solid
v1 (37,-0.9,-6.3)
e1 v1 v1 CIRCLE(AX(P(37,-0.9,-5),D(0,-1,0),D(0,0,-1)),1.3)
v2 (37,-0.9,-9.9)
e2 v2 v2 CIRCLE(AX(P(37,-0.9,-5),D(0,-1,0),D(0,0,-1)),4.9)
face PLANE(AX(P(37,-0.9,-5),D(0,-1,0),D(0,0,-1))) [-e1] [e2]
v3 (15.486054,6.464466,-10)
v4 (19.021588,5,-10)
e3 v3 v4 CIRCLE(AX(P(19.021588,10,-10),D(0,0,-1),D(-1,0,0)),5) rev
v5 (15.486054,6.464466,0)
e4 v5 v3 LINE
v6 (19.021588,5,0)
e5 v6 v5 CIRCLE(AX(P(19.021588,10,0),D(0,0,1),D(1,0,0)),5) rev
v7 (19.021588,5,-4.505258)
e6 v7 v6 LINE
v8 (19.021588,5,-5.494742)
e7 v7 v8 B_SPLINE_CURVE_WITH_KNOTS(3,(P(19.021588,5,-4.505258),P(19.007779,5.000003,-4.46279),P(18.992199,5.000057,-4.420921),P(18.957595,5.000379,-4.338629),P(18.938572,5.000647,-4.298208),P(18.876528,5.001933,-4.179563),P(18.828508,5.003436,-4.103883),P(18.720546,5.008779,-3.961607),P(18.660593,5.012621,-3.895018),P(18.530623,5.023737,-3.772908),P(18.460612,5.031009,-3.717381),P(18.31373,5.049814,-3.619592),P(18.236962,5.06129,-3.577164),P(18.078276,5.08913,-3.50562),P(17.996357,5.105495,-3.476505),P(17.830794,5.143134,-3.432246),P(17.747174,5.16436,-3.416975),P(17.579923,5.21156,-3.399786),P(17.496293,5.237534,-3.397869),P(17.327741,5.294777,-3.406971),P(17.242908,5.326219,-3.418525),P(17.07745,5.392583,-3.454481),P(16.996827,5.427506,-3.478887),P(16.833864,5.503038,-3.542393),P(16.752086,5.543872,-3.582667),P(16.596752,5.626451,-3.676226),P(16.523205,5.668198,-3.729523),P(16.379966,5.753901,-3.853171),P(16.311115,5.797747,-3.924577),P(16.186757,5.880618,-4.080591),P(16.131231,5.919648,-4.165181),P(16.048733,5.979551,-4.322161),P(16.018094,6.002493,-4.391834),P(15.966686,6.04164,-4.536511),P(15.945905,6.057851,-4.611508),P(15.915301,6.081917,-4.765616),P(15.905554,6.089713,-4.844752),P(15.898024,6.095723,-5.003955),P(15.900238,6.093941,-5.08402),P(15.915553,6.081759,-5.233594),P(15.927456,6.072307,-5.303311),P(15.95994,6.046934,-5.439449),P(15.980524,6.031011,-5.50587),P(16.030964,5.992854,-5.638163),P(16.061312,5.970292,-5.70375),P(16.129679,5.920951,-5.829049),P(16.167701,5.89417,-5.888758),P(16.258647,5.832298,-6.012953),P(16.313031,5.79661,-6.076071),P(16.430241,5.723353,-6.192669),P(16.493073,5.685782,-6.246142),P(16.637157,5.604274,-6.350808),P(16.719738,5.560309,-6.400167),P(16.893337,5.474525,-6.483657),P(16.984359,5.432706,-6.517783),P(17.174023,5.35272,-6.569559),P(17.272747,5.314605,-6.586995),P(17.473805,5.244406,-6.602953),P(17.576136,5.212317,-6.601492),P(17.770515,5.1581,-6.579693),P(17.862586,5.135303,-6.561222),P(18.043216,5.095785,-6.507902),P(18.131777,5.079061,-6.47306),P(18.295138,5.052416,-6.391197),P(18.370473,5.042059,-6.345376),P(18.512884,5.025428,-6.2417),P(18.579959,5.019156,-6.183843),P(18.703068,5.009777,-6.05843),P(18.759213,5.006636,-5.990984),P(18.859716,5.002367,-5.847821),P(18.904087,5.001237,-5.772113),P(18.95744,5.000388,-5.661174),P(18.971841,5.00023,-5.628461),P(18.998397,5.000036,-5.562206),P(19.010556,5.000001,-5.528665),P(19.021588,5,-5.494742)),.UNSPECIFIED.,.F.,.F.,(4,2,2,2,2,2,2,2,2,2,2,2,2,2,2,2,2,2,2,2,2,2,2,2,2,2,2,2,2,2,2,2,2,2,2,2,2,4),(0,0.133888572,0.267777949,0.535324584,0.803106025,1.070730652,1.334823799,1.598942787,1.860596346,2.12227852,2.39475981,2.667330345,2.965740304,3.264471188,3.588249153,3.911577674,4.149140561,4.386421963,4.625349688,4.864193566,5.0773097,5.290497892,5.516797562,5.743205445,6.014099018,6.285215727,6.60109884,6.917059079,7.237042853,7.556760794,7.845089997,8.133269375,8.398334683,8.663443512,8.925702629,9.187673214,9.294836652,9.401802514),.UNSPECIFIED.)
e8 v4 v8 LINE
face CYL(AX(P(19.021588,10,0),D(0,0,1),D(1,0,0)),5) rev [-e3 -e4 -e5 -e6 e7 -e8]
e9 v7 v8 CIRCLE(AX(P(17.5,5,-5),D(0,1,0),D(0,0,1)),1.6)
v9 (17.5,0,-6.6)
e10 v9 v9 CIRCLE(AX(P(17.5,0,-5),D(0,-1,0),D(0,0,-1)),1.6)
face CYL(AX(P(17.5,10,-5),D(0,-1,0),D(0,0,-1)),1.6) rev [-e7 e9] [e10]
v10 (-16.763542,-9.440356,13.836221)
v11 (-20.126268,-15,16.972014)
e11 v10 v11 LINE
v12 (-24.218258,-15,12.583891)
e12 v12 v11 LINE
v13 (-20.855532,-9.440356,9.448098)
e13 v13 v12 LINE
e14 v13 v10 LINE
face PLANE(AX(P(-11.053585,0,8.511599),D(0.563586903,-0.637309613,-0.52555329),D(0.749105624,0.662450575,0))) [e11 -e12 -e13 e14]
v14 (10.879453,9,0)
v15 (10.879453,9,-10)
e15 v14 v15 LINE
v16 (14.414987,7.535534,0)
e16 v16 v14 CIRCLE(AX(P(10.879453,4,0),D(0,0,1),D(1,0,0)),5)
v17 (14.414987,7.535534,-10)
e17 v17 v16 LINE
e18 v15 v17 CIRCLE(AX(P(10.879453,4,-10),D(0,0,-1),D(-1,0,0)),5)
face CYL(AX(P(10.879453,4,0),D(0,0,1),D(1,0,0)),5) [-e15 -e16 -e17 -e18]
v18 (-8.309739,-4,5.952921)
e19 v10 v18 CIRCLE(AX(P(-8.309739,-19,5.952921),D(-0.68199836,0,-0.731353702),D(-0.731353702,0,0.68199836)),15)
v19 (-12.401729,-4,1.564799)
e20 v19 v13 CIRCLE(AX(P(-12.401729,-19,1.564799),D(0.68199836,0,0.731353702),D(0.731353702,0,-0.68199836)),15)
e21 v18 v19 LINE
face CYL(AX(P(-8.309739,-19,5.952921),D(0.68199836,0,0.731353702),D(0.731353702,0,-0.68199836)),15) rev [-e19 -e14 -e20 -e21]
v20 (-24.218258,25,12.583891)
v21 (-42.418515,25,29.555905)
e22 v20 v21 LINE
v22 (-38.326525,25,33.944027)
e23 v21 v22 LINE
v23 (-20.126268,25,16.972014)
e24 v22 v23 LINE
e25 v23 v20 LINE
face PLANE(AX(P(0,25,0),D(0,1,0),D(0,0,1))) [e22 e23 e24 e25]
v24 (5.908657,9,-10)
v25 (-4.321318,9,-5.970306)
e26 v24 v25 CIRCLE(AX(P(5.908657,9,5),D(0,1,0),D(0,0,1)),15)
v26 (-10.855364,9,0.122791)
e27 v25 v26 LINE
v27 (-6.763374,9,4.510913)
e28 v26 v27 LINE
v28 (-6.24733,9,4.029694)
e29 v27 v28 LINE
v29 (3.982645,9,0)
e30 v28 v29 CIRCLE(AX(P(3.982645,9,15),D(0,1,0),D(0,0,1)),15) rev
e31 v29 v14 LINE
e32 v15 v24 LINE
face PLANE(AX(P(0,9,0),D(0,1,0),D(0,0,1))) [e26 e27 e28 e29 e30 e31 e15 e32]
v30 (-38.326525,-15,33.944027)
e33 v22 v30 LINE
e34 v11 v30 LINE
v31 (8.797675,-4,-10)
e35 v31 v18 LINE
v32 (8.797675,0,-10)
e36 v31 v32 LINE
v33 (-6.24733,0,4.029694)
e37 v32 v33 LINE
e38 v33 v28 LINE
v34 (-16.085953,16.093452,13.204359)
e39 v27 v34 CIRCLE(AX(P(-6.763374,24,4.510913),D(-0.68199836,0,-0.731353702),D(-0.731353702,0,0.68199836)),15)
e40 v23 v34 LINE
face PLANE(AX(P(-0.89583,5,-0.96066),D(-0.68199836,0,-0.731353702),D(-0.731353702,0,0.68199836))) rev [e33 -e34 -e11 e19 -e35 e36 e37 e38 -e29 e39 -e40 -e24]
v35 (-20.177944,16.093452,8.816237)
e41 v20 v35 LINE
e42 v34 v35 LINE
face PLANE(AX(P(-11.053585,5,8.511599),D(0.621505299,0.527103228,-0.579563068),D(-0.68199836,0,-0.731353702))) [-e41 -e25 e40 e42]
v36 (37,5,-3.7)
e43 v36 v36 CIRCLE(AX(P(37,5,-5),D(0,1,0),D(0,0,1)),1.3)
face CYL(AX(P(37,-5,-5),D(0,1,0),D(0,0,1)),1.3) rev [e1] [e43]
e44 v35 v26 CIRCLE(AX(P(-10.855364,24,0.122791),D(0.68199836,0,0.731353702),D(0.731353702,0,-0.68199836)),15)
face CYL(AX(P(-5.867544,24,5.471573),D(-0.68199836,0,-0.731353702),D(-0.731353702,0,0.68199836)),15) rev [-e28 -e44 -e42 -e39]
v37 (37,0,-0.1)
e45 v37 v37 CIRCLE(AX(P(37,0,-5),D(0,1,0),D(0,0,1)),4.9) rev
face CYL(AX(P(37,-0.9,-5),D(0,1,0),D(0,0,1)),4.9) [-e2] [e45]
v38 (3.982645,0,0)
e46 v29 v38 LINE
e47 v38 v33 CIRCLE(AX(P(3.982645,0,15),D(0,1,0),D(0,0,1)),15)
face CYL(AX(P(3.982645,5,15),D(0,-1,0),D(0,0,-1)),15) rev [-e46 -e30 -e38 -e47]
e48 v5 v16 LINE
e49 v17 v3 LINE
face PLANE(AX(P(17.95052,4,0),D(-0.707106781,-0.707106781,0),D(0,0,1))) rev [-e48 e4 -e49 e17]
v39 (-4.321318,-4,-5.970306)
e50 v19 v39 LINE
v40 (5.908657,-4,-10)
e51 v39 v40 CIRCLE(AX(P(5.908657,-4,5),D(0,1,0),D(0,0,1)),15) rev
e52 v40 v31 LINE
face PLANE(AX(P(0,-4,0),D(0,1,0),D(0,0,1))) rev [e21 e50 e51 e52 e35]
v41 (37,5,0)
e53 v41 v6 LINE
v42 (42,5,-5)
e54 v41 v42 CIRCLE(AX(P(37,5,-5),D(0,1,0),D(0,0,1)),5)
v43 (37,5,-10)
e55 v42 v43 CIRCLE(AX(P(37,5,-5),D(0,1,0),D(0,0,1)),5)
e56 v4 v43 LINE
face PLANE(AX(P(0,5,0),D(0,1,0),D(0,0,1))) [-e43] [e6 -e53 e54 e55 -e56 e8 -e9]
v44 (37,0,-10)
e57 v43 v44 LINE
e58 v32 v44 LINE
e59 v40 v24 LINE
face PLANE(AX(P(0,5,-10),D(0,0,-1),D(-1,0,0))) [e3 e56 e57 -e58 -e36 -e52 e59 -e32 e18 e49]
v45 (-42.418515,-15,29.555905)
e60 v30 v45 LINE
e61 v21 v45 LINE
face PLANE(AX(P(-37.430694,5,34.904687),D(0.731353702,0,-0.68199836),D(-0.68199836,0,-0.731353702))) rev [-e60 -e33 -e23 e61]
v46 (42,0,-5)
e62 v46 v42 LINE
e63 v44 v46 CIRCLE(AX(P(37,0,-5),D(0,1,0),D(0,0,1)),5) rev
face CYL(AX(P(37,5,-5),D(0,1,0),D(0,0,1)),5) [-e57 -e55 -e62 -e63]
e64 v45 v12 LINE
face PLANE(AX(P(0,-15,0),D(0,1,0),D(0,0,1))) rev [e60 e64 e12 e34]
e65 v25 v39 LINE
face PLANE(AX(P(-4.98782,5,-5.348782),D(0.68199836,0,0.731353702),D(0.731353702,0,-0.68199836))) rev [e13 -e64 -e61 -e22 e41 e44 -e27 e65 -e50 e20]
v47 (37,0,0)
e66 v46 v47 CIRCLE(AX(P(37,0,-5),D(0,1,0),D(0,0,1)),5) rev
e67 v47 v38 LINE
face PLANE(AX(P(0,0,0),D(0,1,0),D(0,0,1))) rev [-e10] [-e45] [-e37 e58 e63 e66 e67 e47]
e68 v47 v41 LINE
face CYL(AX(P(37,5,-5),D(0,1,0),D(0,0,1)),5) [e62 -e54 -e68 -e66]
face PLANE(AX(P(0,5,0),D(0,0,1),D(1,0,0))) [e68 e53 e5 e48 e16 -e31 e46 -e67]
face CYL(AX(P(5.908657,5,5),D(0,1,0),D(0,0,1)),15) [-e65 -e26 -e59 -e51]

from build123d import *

# Parameters (mm, degrees)
BOSS_EXTRUDE1_DEPTH = 5
FILLET1_R           = 5
SKETCH2_R           = 1.2999999999999945
CUT_EXTRUDE1_DEPTH  = 10
BOSS_EXTRUDE2_DEPTH = 20
BOSS_EXTRUDE3_DEPTH = 15
BOSS_EXTRUDE4_DEPTH = 6
SKETCH6_R           = 4.900000000000002
SKETCH6_R_2         = 1.299999999999994
BOSS_EXTRUDE5_DEPTH = 0.9
BOSS_EXTRUDE6_DEPTH = 3.9999999999999964
BOSS_EXTRUDE7_DEPTH = 3.9999999999999964
FILLET2_R           = 15
FILLET7_SIZE        = 5
FILLET8_R           = 5
SKETCH10_R          = 1.6000000000000019
CUT_EXTRUDE2_DEPTH  = 10


# Some blends are built 0.0001 mm under size
with BuildPart() as part:
    # Sketch1 → Boss-Extrude1 (new body)
    with BuildSketch(Plane(origin=(0, 0, 0), x_dir=(1, 0, 0), z_dir=(0, 1, 0))):
        Polygon((4.091990160374978, 5.611877790284978), (0, 10), (0, 1.79603523340848), align=None)
        Polygon((0, 1.79603523340848), (0, 10), (-42.4185146939121, -29.55590488362469), (-38.32652453353713, -33.94402709333974), (-1.9260119864091507, 0), align=None)
        Polygon((42, 10), (0, 10), (4.091990160374978, 5.611877790284978), (0, 1.7960352334084817), (0, 0), (42, 0), align=None)
        Polygon((0, 0), (0, 1.79603523340848), (-1.9260119864091507, 0), align=None)
    extrude(amount=BOSS_EXTRUDE1_DEPTH)

    # Fillet1
    fillet1_edges = [part.edges().sort_by_distance(p)[0] for p in [
        (42, 2.5, 0),
        (42, 2.5, -10),
    ]]
    fillet(fillet1_edges, radius=FILLET1_R - 0.0001)  # a hair under: the kernel refuses the full size

    # Sketch2 → Cut-Extrude1 (cut)
    with BuildSketch(Plane(origin=(0, 5, 0), x_dir=(1, 0, 0), z_dir=(0, 1, 0))):
        with Locations(Location((37.00000000000001, 4.999999999999989, 0), (0, 0, 270))):
            Circle(SKETCH2_R)
    extrude(amount=-CUT_EXTRUDE1_DEPTH, mode=Mode.SUBTRACT)

    # Sketch3 → Boss-Extrude2 (add)
    with BuildSketch(Plane(origin=(0, 5, 0), x_dir=(1, 0, 0), z_dir=(0, 1, 0))):
        Polygon((-42.4185146939121, -29.55590488362471), (-38.32652453353713, -33.94402709333974), (-20.126268259973138, -16.97201354666987), (-24.21825842034811, -12.583891336954824), align=None)
    extrude(amount=BOSS_EXTRUDE2_DEPTH)

    # Sketch4 → Boss-Extrude3 (add)
    with BuildSketch(Plane.XZ):
        Polygon((-42.4185146939121, 29.55590488362471), (-38.32652453353713, 33.94402709333974), (-20.126268259973134, 16.972013546669885), (-24.218258420348107, 12.583891336954828), align=None)
    extrude(amount=BOSS_EXTRUDE3_DEPTH)

    # Sketch5 → Boss-Extrude4 (add)
    with BuildSketch(Plane(origin=(-4.987820251299118, 0, -5.348782368720677), x_dir=(-0.7313537016191739, 0, 0.6819983600624947), z_dir=(-0.6819983600624948, 0, -0.731353701619174))):
        Polygon((26.29430619749914, -15), (26.29430619749914, 0), (13.888976828400956, 0), align=None)
        Polygon((13.888976828400958, 5), (26.29430619749914, 25), (26.29430619749914, 5), align=None)
    extrude(amount=-BOSS_EXTRUDE4_DEPTH)

    # Sketch6 → Boss-Extrude5 (add)
    with BuildSketch(Plane.XZ):
        with Locations(Location((37.00000000000001, -4.999999999999989, 0), (0, 0, 90))):
            Circle(SKETCH6_R)
        with Locations(Location((37.00000000000001, -4.999999999999989, 0), (0, 0, 90))):
            Circle(SKETCH6_R_2, mode=Mode.SUBTRACT)
    extrude(amount=BOSS_EXTRUDE5_DEPTH)

    # Sketch8 → Boss-Extrude6 (add)
    with BuildSketch(Plane.XZ):
        Polygon((0, -10), (-19.681916643400598, 8.353684194074795), (-15.589926483025625, 12.741806403789838), (8.797675113837775, -10), align=None)
    extrude(amount=BOSS_EXTRUDE6_DEPTH)

    # Sketch9 → Boss-Extrude7 (add)
    with BuildSketch(Plane(origin=(0, 5, 0), x_dir=(1, 0, 0), z_dir=(0, 1, 0))):
        Polygon((0, 10), (-20.891607783919927, -9.48173943217613), (-16.79961762354496, -13.869861641891177), (-1.92601198640914, -7.11e-15), (17.950520425486616, 5.22e-15), (17.950520425486616, 10), align=None)
    extrude(amount=BOSS_EXTRUDE7_DEPTH)

    # Fillet2
    fillet2_edges = [part.edges().sort_by_distance(p)[0] for p in [
        (-14.914116497044613, 8.999999999999996, 8.009621013204299),
        (-1.9260119864091478, 4.499999999999998, 2.06e-15),
        (0, 2.5, -10),
        (-15.518962067304274, -3.9999999999999973, 8.573648632254974),
    ]]
    fillet(fillet2_edges, radius=FILLET2_R)

    # Fillet7
    # the kernel refuses this chamfer: 5 mm, written as the material it takes off along each edge
    with BuildSketch(Plane(origin=(17.950520425486616, 8.999999999999996, 12.858414939829549), x_dir=(0.027495876610586317, -0.9996219169112968, 0), z_dir=(0, 0, -1))) as fillet7_piece_1_section:
        Polygon((FILLET7_SIZE * 0.999621916911, FILLET7_SIZE * 0.0274958766106), (-FILLET7_SIZE * 0.0274958766106, FILLET7_SIZE * 0.999621916911), (0, 0), align=None)
    fillet7_piece_1 = extrude(amount=35.71682987965911, mode=Mode.PRIVATE)
    fillet7_piece_1 = split(fillet7_piece_1, bisect_by=Plane(origin=(16.221928363932022, 5, -5.000000000000004), z_dir=(0, 1, 0)), keep=Keep.TOP, mode=Mode.PRIVATE)
    add(fillet7_piece_1, mode=Mode.SUBTRACT)

    # Fillet8
    fillet8_edges = [part.edges().sort_by_distance(p)[0] for p in [
        (12.95052042548848, 8.999999999998002, -5.000000000000002),
        (16.950520425489678, 5, -4.999999999999999),
    ]]
    fillet(fillet8_edges, radius=FILLET8_R)

    # Sketch10 → Cut-Extrude2 (cut)
    with BuildSketch(Plane(origin=(0, 0, 0), x_dir=(-1, 0, 0), z_dir=(0, -1, 0))):
        with Locations(Location((-17.499999999999247, 5.000000000001407, 0), (0, 0, 90))):
            Circle(SKETCH10_R)
    extrude(amount=-CUT_EXTRUDE2_DEPTH, mode=Mode.SUBTRACT)


solid = part.part
